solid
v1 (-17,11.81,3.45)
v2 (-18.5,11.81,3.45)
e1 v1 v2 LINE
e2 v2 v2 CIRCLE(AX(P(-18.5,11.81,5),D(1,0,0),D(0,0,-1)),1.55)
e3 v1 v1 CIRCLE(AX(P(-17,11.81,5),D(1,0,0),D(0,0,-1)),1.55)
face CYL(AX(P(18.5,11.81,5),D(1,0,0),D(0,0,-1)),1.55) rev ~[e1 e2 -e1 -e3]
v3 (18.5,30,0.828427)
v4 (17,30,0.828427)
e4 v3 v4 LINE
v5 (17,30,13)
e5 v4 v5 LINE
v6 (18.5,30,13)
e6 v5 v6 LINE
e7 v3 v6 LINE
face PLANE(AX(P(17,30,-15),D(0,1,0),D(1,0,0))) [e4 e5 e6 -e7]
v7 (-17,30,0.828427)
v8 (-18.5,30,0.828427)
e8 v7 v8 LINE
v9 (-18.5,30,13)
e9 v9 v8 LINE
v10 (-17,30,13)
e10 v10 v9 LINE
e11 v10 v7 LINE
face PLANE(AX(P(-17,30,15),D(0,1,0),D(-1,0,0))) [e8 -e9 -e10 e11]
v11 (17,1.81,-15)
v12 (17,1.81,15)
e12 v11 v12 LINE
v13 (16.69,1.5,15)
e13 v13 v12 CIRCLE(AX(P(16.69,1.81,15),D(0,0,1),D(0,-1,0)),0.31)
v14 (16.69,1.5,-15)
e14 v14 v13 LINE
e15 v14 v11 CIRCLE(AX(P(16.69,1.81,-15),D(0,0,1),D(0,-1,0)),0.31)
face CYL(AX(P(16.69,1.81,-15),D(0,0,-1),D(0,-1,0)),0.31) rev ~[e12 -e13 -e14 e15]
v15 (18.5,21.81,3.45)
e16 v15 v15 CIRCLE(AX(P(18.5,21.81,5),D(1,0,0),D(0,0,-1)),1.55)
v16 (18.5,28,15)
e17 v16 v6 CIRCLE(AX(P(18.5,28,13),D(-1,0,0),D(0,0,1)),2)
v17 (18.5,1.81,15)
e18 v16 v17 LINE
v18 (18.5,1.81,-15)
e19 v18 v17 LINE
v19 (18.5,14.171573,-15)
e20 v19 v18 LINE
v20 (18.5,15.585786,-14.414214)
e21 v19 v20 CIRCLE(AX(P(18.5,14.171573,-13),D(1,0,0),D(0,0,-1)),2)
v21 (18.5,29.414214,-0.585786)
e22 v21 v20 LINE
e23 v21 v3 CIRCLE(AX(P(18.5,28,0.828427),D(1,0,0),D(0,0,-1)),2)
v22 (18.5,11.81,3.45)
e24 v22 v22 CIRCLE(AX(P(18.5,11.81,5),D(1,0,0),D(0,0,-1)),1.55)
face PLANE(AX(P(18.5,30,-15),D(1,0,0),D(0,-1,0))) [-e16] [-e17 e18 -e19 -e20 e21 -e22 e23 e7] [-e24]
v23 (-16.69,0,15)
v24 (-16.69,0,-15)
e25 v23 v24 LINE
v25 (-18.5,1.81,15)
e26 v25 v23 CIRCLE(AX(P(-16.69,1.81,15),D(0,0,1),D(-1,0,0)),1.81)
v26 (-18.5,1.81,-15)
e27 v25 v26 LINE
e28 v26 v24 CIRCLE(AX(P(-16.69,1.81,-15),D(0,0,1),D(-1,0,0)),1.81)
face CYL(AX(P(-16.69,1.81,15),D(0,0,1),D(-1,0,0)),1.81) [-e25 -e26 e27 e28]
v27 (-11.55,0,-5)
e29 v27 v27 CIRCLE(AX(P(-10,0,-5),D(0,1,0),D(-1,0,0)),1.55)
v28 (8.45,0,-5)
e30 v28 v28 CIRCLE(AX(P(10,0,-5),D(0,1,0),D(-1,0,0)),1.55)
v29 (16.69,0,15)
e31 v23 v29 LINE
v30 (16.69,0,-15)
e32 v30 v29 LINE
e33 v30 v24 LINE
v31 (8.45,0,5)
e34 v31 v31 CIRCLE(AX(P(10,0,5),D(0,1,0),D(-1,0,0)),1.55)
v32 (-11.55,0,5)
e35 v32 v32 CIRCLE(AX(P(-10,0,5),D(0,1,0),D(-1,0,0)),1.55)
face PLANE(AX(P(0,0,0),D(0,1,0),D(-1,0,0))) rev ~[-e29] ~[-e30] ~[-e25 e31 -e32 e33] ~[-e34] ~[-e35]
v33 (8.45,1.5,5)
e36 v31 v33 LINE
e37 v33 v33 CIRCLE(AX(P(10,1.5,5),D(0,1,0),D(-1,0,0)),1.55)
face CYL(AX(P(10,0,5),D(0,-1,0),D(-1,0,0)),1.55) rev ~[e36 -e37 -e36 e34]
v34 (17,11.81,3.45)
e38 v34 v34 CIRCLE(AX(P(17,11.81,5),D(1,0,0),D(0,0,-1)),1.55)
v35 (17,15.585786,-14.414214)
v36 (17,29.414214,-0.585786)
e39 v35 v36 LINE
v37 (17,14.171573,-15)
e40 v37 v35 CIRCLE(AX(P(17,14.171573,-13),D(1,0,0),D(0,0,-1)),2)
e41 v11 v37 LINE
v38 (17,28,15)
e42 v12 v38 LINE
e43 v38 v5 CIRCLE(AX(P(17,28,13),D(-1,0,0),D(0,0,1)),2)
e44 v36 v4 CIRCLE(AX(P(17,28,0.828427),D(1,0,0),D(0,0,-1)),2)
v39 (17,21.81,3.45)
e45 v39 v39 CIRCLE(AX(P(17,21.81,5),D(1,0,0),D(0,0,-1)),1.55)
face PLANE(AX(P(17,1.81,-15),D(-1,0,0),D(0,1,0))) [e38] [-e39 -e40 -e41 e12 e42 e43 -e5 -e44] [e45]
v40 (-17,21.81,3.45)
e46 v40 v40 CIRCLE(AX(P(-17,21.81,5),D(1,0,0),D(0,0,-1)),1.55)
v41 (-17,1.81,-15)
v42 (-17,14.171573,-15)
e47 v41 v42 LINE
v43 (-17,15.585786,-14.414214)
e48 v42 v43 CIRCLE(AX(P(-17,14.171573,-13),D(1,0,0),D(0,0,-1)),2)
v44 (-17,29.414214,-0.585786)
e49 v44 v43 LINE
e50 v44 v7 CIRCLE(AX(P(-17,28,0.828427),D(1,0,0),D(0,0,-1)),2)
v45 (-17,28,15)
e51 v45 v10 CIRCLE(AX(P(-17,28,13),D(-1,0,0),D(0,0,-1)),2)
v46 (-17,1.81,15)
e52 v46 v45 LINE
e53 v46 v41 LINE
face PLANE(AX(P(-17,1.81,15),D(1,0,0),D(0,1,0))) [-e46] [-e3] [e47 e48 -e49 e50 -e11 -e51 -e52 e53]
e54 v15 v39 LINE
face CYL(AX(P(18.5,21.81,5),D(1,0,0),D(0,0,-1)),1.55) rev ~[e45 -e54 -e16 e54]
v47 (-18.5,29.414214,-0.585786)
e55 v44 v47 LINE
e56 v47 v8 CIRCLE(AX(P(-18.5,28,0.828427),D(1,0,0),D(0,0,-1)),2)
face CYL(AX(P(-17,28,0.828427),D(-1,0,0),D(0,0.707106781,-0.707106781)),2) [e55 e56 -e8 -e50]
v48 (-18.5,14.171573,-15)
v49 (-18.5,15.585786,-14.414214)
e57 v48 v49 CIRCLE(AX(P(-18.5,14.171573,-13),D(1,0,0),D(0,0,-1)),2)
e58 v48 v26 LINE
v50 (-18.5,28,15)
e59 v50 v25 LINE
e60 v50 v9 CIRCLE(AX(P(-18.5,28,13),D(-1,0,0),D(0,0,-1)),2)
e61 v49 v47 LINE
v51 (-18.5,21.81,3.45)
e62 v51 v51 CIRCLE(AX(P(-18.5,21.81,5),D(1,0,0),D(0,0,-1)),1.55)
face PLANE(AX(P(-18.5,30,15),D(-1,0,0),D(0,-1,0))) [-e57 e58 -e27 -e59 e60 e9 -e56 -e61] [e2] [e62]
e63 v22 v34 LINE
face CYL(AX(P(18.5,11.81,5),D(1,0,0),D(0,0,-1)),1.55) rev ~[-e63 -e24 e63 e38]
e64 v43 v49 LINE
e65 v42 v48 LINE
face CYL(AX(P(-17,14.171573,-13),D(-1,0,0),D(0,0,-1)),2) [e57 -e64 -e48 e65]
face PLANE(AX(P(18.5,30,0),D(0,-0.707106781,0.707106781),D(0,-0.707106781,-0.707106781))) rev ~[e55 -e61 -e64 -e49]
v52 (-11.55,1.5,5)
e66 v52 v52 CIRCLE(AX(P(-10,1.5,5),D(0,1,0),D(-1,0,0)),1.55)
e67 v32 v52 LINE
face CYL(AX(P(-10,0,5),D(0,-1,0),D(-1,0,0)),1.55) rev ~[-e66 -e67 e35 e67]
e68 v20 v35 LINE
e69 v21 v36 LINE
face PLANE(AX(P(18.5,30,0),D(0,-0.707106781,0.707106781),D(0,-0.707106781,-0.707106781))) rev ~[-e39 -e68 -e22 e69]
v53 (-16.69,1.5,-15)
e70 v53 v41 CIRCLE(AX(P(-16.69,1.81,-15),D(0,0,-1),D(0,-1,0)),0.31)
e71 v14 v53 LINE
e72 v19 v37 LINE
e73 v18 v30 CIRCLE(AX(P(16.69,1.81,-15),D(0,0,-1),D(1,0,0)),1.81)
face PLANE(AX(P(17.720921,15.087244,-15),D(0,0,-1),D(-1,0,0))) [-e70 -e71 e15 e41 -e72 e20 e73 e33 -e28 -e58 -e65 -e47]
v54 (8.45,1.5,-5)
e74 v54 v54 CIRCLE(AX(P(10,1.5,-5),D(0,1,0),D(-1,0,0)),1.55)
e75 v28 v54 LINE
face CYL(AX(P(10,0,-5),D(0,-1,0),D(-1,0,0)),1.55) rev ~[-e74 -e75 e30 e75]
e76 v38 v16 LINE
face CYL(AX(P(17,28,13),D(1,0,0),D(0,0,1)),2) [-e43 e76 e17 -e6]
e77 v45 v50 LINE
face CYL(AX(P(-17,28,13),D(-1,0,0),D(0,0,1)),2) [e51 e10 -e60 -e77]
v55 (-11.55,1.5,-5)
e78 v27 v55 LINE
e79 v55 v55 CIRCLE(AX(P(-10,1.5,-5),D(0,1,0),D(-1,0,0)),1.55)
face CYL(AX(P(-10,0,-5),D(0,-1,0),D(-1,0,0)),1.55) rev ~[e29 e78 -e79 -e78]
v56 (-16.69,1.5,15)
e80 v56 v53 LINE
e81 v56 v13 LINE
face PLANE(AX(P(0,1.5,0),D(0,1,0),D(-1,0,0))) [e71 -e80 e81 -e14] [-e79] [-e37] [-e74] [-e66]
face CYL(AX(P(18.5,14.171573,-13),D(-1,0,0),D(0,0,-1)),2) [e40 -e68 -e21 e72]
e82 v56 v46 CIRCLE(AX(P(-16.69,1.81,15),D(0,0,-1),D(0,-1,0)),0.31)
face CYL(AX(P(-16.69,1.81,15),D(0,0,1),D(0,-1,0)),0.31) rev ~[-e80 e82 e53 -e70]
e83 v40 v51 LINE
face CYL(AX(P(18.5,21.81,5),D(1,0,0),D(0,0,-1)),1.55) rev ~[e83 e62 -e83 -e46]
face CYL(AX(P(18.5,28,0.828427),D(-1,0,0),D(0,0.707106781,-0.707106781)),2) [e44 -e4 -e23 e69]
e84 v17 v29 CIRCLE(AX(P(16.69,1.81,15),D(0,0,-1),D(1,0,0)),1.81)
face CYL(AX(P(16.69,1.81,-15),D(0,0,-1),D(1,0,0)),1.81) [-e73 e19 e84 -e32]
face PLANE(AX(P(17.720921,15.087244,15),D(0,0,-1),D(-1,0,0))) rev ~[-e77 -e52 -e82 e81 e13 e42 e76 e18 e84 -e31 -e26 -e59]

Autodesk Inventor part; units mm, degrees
ref_plane "YZ Plane" through (0, 0, 0) normal (1, 0, 0) x (0, 1, 0)
ref_plane "XZ Plane" through (0, 0, 0) normal (0, 1, 0) x (-1, 0, 0)
ref_plane "XY Plane" through (0, 0, 0) normal (0, 0, 1) x (1, 0, 0)
sketch "Sketch1" plane through (0, 0, 0) normal (0, 1, 0) x (-1, 0, 0)
  line L0 (18.5, 15) -> (-18.5, 15)
  line L1 (-18.5, 15) -> (-18.5, -15)
  line L2 (-18.5, -15) -> (18.5, -15)
  line L3 (18.5, -15) -> (18.5, 15)
  line L4 (18.5, 15) -> (-18.5, -15) construction
  line L5 (-18.5, 15) -> (18.5, -15) construction
  circle A0 centre (10, 5) radius 1.55
  circle A1 centre (10, -5) radius 1.55
  circle A2 centre (-10, 5) radius 1.55
  circle A3 centre (-10, -5) radius 1.55
  point P0 (0, 0)
  dimension "d0" = 37
  dimension "d1" = 30
  dimension "d2" = 3.1
  dimension "d3" = 3.1
  dimension "d4" = 3.1
  dimension "d5" = 3.1
  dimension "d6" = 20
  dimension "d7" = 20
  dimension "d8" = 10
  dimension "d10" = 10
  dimension "d11" = 0
  dimension "d12" = 0
  dimension "d13" = 10
  dimension "d14" = 8.5
extrude "Plate1" add sketch "Sketch1" along normal blind 1.5
sketch "Sketch2" plane through (17, 0, -15) normal (1, 0, 0) x (0, 1, 0)
  line L0 (0, 30) -> (0, 0)
  line L1 (0, 0) -> (30, 0)
  line L2 (30, 0) -> (30, 30)
  line L3 (30, 30) -> (0, 30)
edge flange "Flange1" height 30 angle 90 thickness 1.5 bend radius 0.31 thickness toward (1, 0, 0) relief tear relief width 1.5 relief depth 0.75 corner gap 0.31 corner form 0 edges at (18.5, 1.5, 0) (-18.5, 1.5, 0) wall of the first edge with corners at (17, 0, 15) (17, 0, -15) (17, 30, -15) (17, 30, 15)
bend "Bend1"
corner "Corner1"
sketch "Sketch3" plane through (18.5, 30, 15) normal (1, 0, 0) x (0, 0, -1)
  circle A0 centre (10, -8.19) radius 1.55
  circle A1 centre (10, -18.19) radius 1.55
  line L0 (0, -28.19) -> (0, 0) projected
  line L1 (0, -28.19) -> (30, -28.19) projected
  point P0 (15, -30)
  dimension "d26" = 3.1
  dimension "d27" = 3.1
  dimension "d28" = 10
  dimension "d29" = 10
  dimension "d30" = 10
  dimension "d31" = 10
extrude "Cut1" cut sketch "Sketch3" against normal through all
sketch "Sketch5" plane through (18.5, 30, 15) normal (1, 0, 0) x (0, 0, -1)
  line L0 (15, 0) -> (30, -15)
  line L1 (30, -15) -> (30, 0)
  line L2 (30, 0) -> (15, 0)
  line L3 (30, 0) -> (30, -28.19) projected
  line L4 (0, 0) -> (30, 0) projected
  point P0 (15, -30)
  dimension "d36" = 15
  dimension "d37" = 15
extrude "Cut2" cut sketch "Sketch5" against normal through all
fillet "Fillet1" radius 2 6 edges at (17.75, 30, 15) (17.75, 30, 0) (17.75, 15, -15) (-17.75, 30, 15) (-17.75, 30, 0) (-17.75, 15, -15)
equation "\"d7\" = d6"
equation "\"d10\" = d8"
equation "\"d32\" = Thickness"
equation "\"d38\" = Thickness"
equation "\"d15\" = Thickness"
equation "\"d16\" = BendReliefWidth"
equation "\"d17\" = BendReliefDepth"
equation "\"d18\" = MinimumRemnant"
equation "\"d19\" = TransitionRadius"
equation "\"d22\" = BendRadius"
equation "\"d23\" = CornerReliefSize"
equation "\"d24\" = GapSize"
equation "\"d25\" = JacobiRadiusSize"
equation "\"BendReliefWidth\" = Thickness"
equation "\"BendReliefDepth\" = 0.5 * Thickness"
equation "\"CornerReliefSize\" = 4 * Thickness"
equation "\"MinimumRemnant\" = 2 * Thickness"
equation "\"TransitionRadius\" = BendRadius"
equation "\"JacobiRadiusSize\" = BendRadius"
equation "\"GapSize\" = Thickness"
equation "\"Thickness\" = 1.5"
equation "\"BendRadius\" = 0.31"
properties part number "Head1" material "Aluminum 6061-AHC"
